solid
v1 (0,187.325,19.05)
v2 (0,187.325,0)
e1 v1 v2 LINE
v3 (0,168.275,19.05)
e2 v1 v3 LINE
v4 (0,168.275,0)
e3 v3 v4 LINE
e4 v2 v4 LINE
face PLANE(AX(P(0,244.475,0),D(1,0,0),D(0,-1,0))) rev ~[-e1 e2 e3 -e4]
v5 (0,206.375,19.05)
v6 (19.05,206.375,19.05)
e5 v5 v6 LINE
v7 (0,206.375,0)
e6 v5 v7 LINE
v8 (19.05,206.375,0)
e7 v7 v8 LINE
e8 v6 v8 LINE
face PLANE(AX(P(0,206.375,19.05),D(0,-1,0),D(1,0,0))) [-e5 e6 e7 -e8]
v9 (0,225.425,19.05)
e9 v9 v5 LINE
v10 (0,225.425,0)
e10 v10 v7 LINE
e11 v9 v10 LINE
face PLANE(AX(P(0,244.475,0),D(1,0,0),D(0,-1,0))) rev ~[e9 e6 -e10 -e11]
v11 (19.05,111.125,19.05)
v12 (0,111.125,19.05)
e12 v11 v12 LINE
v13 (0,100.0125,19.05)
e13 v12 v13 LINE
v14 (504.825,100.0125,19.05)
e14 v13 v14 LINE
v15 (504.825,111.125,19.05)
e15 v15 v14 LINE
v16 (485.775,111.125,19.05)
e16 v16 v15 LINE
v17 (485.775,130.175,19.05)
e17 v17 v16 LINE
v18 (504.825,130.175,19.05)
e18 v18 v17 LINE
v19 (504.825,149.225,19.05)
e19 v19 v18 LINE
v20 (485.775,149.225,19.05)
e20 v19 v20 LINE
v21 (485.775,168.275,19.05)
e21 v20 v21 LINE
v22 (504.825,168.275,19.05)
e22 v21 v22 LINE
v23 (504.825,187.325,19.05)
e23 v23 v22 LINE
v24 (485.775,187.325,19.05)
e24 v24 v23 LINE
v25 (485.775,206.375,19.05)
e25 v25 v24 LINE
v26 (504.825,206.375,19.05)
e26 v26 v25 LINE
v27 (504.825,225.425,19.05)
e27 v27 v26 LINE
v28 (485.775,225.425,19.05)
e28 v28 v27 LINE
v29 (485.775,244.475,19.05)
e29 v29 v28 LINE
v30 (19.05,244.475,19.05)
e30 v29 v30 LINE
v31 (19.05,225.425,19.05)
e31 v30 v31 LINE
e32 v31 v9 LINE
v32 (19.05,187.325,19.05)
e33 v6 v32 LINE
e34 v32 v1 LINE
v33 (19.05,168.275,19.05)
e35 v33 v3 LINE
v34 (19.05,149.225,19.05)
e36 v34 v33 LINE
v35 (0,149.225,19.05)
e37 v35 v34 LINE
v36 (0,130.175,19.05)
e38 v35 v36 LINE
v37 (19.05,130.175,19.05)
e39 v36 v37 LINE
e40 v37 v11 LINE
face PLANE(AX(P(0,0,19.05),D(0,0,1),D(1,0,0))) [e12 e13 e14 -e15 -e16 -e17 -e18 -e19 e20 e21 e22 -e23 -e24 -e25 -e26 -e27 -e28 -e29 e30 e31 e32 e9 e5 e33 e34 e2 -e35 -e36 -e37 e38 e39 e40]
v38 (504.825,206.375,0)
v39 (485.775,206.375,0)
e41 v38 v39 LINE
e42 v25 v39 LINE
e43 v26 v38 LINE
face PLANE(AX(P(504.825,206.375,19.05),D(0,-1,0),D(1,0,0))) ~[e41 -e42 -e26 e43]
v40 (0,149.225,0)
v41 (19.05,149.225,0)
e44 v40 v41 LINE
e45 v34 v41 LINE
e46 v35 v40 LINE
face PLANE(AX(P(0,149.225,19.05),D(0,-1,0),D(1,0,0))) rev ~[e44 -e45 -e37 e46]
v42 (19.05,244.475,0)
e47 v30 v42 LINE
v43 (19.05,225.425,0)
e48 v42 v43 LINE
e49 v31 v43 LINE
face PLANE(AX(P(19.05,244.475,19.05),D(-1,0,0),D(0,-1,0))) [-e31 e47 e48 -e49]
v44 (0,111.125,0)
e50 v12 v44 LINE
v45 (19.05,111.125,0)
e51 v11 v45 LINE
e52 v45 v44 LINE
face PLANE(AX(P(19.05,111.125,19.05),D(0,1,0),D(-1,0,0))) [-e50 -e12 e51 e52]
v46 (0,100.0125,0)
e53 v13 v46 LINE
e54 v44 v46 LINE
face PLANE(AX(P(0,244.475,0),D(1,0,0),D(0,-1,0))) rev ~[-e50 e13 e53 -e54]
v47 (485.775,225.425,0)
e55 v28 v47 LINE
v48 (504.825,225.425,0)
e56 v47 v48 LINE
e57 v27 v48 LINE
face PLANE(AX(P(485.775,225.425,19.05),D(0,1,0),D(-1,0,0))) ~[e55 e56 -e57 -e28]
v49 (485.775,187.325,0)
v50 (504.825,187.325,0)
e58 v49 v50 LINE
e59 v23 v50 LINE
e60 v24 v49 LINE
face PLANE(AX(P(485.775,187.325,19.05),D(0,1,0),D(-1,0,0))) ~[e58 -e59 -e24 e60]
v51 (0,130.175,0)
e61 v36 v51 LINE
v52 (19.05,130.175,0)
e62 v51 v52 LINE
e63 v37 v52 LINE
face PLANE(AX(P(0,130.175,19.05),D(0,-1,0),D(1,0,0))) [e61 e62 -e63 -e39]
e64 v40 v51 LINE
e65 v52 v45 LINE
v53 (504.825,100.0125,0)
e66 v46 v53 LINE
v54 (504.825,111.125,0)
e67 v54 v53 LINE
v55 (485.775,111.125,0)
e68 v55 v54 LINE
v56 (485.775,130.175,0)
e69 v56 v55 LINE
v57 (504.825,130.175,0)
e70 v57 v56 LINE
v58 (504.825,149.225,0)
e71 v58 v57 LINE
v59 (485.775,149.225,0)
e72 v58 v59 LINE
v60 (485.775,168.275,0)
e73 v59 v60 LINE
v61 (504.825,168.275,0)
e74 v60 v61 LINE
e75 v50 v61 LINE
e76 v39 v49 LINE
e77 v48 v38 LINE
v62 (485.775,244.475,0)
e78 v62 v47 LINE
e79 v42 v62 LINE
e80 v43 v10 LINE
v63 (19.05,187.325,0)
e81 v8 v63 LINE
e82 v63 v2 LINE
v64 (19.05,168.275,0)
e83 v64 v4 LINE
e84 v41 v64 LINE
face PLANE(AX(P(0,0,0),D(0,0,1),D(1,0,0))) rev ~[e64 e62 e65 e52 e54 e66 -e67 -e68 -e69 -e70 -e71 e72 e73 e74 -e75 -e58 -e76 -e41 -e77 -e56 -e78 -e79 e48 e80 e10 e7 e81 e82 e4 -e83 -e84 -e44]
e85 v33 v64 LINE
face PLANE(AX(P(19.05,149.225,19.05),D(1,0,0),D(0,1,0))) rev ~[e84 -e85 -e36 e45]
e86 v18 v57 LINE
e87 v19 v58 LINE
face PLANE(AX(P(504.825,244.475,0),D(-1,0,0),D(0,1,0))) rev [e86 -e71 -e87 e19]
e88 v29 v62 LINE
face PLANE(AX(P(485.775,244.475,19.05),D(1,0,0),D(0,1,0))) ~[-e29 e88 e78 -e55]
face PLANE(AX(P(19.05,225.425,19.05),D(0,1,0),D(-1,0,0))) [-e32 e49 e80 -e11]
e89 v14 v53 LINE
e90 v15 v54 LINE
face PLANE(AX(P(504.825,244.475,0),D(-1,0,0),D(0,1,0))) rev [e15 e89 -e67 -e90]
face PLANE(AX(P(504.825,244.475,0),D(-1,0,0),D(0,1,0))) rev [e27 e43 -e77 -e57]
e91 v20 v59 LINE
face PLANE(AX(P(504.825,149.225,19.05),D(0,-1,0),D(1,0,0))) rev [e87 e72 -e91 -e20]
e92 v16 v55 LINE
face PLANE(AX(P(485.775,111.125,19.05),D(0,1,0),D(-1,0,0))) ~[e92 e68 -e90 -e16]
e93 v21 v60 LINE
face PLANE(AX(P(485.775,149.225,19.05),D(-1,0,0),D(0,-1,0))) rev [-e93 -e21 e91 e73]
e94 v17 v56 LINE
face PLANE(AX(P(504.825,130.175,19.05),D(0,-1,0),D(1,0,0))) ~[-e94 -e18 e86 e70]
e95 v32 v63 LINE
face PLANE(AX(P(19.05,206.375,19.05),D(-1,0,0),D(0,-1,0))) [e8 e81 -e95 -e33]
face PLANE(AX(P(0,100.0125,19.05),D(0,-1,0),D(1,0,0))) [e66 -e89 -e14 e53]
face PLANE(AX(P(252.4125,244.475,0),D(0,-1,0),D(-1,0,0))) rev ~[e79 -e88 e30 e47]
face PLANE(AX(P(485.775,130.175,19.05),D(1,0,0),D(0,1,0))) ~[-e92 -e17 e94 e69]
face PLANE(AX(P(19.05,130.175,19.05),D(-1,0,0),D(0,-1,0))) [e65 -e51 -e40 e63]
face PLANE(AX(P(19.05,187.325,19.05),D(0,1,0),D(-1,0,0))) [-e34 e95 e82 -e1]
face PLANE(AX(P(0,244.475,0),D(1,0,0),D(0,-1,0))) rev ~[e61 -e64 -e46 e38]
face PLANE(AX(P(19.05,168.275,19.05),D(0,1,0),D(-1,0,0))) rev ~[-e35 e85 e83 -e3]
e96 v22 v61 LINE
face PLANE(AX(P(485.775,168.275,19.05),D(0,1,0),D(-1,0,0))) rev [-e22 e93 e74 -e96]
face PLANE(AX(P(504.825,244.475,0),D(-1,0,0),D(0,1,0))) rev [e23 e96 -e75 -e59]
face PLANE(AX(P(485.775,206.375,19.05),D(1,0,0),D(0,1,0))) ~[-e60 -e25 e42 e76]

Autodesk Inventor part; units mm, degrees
ref_plane "YZ Plane" through (0, 0, 0) normal (1, 0, 0) x (0, 1, 0)
ref_plane "XZ Plane" through (0, 0, 0) normal (0, 1, 0) x (-1, 0, 0)
ref_plane "XY Plane" through (0, 0, 0) normal (0, 0, 1) x (1, 0, 0)
sketch "Sketch1" plane through (0, 0, 0) normal (0, 0, 1) x (1, 0, 0)
  line L0 (0, 0) -> (252.4125, 0)
  line L1 (252.4125, 0) -> (252.4125, 244.475)
  line L2 (252.4125, 244.475) -> (0, 244.475)
  line L3 (0, 244.475) -> (0, 0)
  dimension "d0" = 252.4125
  dimension "d1" = 244.475
extrude "Extrusion1" add sketch "Sketch1" along normal blind 19.05
sketch "Sketch3" plane through (0, 0, 19.05) normal (0, 0, 1) x (1, 0, 0)
  line L0 (0, 0) -> (252.4125, 0) projected
  line L1 (252.4125, 244.475) -> (0, 244.475) projected
  line L2 (0, 244.475) -> (0, 0) projected
  line L3 (0, 244.475) -> (19.05, 244.475)
  line L4 (19.05, 244.475) -> (19.05, 225.425)
  line L5 (19.05, 225.425) -> (0, 225.425)
  line L6 (0, 225.425) -> (0, 244.475)
  line L7 (19.05, 168.275) -> (0, 168.275)
  line L8 (0, 168.275) -> (0, 149.225)
  line L9 (0, 149.225) -> (19.05, 149.225)
  line L10 (19.05, 149.225) -> (19.05, 168.275)
  line L11 (0, 130.175) -> (19.05, 130.175)
  line L12 (19.05, 130.175) -> (19.05, 111.125)
  line L13 (19.05, 111.125) -> (0, 111.125)
  line L14 (0, 111.125) -> (0, 130.175)
  line L15 (0, 206.375) -> (19.05, 206.375)
  line L16 (19.05, 206.375) -> (19.05, 187.325)
  line L17 (19.05, 187.325) -> (0, 187.325)
  line L18 (0, 187.325) -> (0, 206.375)
  line L19 (0, 92.075) -> (19.05, 92.075)
  line L20 (19.05, 92.075) -> (19.05, 73.025)
  line L21 (19.05, 73.025) -> (0, 73.025)
  line L22 (0, 73.025) -> (0, 92.075)
  line L23 (0, 53.975) -> (19.05, 53.975)
  line L24 (19.05, 53.975) -> (19.05, 34.925)
  line L25 (19.05, 34.925) -> (0, 34.925)
  line L26 (0, 34.925) -> (0, 53.975)
  line L27 (0, 15.875) -> (19.05, 15.875)
  line L28 (19.05, 15.875) -> (19.05, -3.175)
  line L29 (19.05, -3.175) -> (0, -3.175)
  line L30 (0, -3.175) -> (0, 15.875)
  dimension "d4" = 19.05
  dimension "d5" = 19.05
  dimension "d6" = 244.475
  dimension "d7" = 19.05
  dimension "d8" = 19.05
  dimension "d9" = 19.05
  dimension "d10" = 19.05
  dimension "d11" = 19.05
  dimension "d12" = 19.05
  dimension "d13" = 19.05
  dimension "d14" = 19.05
  dimension "d15" = 19.05
  dimension "d16" = 19.05
  dimension "d17" = 19.05
  dimension "d18" = 19.05
  dimension "d19" = 19.05
  dimension "d20" = 19.05
  dimension "d21" = 19.05
  dimension "d22" = 19.05
  dimension "d23" = 19.05
  dimension "d24" = 15.875
extrude "Extrusion2" cut sketch "Sketch3" against normal through all
mirror "Mirror1" about plane through (252.4125, 0, 0) normal (1, 0, 0)
sketch "Sketch7" plane through (0, 0, 19.05) normal (0, 0, 1) x (1, 0, 0)
  line L0 (19.05, 34.925) -> (0, 34.925) projected
  line L1 (0, 34.925) -> (0, 15.875) projected
  line L2 (0, 15.875) -> (19.05, 15.875) projected
  line L3 (19.05, 15.875) -> (19.05, 0) projected
  line L4 (19.05, 0) -> (485.775, 0) projected
  line L5 (485.775, 15.875) -> (485.775, 0) projected
  line L6 (504.825, 15.875) -> (485.775, 15.875) projected
  line L7 (504.825, 34.925) -> (504.825, 15.875) projected
  line L8 (485.775, 34.925) -> (504.825, 34.925) projected
  line L9 (485.775, 53.975) -> (485.775, 34.925) projected
  line L10 (504.825, 53.975) -> (485.775, 53.975) projected
  line L11 (504.825, 73.025) -> (504.825, 53.975) projected
  line L12 (485.775, 73.025) -> (504.825, 73.025) projected
  line L13 (485.775, 92.075) -> (485.775, 73.025) projected
  line L14 (504.825, 92.075) -> (485.775, 92.075) projected
  line L15 (504.825, 111.125) -> (504.825, 92.075) projected
  line L16 (19.05, 244.475) -> (485.775, 244.475) projected
  line L17 (0, 111.125) -> (0, 92.075) projected
  line L18 (0, 92.075) -> (19.05, 92.075) projected
  line L19 (19.05, 92.075) -> (19.05, 73.025) projected
  line L20 (19.05, 73.025) -> (0, 73.025) projected
  line L21 (0, 73.025) -> (0, 53.975) projected
  line L22 (0, 53.975) -> (19.05, 53.975) projected
  line L23 (19.05, 53.975) -> (19.05, 34.925) projected
  line L24 (0, 100.0125) -> (504.825, 100.0125)
  point P0 (0, 0)
  dimension "d56" = 144.4625
extrude "Extrusion4" cut sketch "Sketch7" against normal through all
properties part number "deep_side" material "Wood (Birch)"
